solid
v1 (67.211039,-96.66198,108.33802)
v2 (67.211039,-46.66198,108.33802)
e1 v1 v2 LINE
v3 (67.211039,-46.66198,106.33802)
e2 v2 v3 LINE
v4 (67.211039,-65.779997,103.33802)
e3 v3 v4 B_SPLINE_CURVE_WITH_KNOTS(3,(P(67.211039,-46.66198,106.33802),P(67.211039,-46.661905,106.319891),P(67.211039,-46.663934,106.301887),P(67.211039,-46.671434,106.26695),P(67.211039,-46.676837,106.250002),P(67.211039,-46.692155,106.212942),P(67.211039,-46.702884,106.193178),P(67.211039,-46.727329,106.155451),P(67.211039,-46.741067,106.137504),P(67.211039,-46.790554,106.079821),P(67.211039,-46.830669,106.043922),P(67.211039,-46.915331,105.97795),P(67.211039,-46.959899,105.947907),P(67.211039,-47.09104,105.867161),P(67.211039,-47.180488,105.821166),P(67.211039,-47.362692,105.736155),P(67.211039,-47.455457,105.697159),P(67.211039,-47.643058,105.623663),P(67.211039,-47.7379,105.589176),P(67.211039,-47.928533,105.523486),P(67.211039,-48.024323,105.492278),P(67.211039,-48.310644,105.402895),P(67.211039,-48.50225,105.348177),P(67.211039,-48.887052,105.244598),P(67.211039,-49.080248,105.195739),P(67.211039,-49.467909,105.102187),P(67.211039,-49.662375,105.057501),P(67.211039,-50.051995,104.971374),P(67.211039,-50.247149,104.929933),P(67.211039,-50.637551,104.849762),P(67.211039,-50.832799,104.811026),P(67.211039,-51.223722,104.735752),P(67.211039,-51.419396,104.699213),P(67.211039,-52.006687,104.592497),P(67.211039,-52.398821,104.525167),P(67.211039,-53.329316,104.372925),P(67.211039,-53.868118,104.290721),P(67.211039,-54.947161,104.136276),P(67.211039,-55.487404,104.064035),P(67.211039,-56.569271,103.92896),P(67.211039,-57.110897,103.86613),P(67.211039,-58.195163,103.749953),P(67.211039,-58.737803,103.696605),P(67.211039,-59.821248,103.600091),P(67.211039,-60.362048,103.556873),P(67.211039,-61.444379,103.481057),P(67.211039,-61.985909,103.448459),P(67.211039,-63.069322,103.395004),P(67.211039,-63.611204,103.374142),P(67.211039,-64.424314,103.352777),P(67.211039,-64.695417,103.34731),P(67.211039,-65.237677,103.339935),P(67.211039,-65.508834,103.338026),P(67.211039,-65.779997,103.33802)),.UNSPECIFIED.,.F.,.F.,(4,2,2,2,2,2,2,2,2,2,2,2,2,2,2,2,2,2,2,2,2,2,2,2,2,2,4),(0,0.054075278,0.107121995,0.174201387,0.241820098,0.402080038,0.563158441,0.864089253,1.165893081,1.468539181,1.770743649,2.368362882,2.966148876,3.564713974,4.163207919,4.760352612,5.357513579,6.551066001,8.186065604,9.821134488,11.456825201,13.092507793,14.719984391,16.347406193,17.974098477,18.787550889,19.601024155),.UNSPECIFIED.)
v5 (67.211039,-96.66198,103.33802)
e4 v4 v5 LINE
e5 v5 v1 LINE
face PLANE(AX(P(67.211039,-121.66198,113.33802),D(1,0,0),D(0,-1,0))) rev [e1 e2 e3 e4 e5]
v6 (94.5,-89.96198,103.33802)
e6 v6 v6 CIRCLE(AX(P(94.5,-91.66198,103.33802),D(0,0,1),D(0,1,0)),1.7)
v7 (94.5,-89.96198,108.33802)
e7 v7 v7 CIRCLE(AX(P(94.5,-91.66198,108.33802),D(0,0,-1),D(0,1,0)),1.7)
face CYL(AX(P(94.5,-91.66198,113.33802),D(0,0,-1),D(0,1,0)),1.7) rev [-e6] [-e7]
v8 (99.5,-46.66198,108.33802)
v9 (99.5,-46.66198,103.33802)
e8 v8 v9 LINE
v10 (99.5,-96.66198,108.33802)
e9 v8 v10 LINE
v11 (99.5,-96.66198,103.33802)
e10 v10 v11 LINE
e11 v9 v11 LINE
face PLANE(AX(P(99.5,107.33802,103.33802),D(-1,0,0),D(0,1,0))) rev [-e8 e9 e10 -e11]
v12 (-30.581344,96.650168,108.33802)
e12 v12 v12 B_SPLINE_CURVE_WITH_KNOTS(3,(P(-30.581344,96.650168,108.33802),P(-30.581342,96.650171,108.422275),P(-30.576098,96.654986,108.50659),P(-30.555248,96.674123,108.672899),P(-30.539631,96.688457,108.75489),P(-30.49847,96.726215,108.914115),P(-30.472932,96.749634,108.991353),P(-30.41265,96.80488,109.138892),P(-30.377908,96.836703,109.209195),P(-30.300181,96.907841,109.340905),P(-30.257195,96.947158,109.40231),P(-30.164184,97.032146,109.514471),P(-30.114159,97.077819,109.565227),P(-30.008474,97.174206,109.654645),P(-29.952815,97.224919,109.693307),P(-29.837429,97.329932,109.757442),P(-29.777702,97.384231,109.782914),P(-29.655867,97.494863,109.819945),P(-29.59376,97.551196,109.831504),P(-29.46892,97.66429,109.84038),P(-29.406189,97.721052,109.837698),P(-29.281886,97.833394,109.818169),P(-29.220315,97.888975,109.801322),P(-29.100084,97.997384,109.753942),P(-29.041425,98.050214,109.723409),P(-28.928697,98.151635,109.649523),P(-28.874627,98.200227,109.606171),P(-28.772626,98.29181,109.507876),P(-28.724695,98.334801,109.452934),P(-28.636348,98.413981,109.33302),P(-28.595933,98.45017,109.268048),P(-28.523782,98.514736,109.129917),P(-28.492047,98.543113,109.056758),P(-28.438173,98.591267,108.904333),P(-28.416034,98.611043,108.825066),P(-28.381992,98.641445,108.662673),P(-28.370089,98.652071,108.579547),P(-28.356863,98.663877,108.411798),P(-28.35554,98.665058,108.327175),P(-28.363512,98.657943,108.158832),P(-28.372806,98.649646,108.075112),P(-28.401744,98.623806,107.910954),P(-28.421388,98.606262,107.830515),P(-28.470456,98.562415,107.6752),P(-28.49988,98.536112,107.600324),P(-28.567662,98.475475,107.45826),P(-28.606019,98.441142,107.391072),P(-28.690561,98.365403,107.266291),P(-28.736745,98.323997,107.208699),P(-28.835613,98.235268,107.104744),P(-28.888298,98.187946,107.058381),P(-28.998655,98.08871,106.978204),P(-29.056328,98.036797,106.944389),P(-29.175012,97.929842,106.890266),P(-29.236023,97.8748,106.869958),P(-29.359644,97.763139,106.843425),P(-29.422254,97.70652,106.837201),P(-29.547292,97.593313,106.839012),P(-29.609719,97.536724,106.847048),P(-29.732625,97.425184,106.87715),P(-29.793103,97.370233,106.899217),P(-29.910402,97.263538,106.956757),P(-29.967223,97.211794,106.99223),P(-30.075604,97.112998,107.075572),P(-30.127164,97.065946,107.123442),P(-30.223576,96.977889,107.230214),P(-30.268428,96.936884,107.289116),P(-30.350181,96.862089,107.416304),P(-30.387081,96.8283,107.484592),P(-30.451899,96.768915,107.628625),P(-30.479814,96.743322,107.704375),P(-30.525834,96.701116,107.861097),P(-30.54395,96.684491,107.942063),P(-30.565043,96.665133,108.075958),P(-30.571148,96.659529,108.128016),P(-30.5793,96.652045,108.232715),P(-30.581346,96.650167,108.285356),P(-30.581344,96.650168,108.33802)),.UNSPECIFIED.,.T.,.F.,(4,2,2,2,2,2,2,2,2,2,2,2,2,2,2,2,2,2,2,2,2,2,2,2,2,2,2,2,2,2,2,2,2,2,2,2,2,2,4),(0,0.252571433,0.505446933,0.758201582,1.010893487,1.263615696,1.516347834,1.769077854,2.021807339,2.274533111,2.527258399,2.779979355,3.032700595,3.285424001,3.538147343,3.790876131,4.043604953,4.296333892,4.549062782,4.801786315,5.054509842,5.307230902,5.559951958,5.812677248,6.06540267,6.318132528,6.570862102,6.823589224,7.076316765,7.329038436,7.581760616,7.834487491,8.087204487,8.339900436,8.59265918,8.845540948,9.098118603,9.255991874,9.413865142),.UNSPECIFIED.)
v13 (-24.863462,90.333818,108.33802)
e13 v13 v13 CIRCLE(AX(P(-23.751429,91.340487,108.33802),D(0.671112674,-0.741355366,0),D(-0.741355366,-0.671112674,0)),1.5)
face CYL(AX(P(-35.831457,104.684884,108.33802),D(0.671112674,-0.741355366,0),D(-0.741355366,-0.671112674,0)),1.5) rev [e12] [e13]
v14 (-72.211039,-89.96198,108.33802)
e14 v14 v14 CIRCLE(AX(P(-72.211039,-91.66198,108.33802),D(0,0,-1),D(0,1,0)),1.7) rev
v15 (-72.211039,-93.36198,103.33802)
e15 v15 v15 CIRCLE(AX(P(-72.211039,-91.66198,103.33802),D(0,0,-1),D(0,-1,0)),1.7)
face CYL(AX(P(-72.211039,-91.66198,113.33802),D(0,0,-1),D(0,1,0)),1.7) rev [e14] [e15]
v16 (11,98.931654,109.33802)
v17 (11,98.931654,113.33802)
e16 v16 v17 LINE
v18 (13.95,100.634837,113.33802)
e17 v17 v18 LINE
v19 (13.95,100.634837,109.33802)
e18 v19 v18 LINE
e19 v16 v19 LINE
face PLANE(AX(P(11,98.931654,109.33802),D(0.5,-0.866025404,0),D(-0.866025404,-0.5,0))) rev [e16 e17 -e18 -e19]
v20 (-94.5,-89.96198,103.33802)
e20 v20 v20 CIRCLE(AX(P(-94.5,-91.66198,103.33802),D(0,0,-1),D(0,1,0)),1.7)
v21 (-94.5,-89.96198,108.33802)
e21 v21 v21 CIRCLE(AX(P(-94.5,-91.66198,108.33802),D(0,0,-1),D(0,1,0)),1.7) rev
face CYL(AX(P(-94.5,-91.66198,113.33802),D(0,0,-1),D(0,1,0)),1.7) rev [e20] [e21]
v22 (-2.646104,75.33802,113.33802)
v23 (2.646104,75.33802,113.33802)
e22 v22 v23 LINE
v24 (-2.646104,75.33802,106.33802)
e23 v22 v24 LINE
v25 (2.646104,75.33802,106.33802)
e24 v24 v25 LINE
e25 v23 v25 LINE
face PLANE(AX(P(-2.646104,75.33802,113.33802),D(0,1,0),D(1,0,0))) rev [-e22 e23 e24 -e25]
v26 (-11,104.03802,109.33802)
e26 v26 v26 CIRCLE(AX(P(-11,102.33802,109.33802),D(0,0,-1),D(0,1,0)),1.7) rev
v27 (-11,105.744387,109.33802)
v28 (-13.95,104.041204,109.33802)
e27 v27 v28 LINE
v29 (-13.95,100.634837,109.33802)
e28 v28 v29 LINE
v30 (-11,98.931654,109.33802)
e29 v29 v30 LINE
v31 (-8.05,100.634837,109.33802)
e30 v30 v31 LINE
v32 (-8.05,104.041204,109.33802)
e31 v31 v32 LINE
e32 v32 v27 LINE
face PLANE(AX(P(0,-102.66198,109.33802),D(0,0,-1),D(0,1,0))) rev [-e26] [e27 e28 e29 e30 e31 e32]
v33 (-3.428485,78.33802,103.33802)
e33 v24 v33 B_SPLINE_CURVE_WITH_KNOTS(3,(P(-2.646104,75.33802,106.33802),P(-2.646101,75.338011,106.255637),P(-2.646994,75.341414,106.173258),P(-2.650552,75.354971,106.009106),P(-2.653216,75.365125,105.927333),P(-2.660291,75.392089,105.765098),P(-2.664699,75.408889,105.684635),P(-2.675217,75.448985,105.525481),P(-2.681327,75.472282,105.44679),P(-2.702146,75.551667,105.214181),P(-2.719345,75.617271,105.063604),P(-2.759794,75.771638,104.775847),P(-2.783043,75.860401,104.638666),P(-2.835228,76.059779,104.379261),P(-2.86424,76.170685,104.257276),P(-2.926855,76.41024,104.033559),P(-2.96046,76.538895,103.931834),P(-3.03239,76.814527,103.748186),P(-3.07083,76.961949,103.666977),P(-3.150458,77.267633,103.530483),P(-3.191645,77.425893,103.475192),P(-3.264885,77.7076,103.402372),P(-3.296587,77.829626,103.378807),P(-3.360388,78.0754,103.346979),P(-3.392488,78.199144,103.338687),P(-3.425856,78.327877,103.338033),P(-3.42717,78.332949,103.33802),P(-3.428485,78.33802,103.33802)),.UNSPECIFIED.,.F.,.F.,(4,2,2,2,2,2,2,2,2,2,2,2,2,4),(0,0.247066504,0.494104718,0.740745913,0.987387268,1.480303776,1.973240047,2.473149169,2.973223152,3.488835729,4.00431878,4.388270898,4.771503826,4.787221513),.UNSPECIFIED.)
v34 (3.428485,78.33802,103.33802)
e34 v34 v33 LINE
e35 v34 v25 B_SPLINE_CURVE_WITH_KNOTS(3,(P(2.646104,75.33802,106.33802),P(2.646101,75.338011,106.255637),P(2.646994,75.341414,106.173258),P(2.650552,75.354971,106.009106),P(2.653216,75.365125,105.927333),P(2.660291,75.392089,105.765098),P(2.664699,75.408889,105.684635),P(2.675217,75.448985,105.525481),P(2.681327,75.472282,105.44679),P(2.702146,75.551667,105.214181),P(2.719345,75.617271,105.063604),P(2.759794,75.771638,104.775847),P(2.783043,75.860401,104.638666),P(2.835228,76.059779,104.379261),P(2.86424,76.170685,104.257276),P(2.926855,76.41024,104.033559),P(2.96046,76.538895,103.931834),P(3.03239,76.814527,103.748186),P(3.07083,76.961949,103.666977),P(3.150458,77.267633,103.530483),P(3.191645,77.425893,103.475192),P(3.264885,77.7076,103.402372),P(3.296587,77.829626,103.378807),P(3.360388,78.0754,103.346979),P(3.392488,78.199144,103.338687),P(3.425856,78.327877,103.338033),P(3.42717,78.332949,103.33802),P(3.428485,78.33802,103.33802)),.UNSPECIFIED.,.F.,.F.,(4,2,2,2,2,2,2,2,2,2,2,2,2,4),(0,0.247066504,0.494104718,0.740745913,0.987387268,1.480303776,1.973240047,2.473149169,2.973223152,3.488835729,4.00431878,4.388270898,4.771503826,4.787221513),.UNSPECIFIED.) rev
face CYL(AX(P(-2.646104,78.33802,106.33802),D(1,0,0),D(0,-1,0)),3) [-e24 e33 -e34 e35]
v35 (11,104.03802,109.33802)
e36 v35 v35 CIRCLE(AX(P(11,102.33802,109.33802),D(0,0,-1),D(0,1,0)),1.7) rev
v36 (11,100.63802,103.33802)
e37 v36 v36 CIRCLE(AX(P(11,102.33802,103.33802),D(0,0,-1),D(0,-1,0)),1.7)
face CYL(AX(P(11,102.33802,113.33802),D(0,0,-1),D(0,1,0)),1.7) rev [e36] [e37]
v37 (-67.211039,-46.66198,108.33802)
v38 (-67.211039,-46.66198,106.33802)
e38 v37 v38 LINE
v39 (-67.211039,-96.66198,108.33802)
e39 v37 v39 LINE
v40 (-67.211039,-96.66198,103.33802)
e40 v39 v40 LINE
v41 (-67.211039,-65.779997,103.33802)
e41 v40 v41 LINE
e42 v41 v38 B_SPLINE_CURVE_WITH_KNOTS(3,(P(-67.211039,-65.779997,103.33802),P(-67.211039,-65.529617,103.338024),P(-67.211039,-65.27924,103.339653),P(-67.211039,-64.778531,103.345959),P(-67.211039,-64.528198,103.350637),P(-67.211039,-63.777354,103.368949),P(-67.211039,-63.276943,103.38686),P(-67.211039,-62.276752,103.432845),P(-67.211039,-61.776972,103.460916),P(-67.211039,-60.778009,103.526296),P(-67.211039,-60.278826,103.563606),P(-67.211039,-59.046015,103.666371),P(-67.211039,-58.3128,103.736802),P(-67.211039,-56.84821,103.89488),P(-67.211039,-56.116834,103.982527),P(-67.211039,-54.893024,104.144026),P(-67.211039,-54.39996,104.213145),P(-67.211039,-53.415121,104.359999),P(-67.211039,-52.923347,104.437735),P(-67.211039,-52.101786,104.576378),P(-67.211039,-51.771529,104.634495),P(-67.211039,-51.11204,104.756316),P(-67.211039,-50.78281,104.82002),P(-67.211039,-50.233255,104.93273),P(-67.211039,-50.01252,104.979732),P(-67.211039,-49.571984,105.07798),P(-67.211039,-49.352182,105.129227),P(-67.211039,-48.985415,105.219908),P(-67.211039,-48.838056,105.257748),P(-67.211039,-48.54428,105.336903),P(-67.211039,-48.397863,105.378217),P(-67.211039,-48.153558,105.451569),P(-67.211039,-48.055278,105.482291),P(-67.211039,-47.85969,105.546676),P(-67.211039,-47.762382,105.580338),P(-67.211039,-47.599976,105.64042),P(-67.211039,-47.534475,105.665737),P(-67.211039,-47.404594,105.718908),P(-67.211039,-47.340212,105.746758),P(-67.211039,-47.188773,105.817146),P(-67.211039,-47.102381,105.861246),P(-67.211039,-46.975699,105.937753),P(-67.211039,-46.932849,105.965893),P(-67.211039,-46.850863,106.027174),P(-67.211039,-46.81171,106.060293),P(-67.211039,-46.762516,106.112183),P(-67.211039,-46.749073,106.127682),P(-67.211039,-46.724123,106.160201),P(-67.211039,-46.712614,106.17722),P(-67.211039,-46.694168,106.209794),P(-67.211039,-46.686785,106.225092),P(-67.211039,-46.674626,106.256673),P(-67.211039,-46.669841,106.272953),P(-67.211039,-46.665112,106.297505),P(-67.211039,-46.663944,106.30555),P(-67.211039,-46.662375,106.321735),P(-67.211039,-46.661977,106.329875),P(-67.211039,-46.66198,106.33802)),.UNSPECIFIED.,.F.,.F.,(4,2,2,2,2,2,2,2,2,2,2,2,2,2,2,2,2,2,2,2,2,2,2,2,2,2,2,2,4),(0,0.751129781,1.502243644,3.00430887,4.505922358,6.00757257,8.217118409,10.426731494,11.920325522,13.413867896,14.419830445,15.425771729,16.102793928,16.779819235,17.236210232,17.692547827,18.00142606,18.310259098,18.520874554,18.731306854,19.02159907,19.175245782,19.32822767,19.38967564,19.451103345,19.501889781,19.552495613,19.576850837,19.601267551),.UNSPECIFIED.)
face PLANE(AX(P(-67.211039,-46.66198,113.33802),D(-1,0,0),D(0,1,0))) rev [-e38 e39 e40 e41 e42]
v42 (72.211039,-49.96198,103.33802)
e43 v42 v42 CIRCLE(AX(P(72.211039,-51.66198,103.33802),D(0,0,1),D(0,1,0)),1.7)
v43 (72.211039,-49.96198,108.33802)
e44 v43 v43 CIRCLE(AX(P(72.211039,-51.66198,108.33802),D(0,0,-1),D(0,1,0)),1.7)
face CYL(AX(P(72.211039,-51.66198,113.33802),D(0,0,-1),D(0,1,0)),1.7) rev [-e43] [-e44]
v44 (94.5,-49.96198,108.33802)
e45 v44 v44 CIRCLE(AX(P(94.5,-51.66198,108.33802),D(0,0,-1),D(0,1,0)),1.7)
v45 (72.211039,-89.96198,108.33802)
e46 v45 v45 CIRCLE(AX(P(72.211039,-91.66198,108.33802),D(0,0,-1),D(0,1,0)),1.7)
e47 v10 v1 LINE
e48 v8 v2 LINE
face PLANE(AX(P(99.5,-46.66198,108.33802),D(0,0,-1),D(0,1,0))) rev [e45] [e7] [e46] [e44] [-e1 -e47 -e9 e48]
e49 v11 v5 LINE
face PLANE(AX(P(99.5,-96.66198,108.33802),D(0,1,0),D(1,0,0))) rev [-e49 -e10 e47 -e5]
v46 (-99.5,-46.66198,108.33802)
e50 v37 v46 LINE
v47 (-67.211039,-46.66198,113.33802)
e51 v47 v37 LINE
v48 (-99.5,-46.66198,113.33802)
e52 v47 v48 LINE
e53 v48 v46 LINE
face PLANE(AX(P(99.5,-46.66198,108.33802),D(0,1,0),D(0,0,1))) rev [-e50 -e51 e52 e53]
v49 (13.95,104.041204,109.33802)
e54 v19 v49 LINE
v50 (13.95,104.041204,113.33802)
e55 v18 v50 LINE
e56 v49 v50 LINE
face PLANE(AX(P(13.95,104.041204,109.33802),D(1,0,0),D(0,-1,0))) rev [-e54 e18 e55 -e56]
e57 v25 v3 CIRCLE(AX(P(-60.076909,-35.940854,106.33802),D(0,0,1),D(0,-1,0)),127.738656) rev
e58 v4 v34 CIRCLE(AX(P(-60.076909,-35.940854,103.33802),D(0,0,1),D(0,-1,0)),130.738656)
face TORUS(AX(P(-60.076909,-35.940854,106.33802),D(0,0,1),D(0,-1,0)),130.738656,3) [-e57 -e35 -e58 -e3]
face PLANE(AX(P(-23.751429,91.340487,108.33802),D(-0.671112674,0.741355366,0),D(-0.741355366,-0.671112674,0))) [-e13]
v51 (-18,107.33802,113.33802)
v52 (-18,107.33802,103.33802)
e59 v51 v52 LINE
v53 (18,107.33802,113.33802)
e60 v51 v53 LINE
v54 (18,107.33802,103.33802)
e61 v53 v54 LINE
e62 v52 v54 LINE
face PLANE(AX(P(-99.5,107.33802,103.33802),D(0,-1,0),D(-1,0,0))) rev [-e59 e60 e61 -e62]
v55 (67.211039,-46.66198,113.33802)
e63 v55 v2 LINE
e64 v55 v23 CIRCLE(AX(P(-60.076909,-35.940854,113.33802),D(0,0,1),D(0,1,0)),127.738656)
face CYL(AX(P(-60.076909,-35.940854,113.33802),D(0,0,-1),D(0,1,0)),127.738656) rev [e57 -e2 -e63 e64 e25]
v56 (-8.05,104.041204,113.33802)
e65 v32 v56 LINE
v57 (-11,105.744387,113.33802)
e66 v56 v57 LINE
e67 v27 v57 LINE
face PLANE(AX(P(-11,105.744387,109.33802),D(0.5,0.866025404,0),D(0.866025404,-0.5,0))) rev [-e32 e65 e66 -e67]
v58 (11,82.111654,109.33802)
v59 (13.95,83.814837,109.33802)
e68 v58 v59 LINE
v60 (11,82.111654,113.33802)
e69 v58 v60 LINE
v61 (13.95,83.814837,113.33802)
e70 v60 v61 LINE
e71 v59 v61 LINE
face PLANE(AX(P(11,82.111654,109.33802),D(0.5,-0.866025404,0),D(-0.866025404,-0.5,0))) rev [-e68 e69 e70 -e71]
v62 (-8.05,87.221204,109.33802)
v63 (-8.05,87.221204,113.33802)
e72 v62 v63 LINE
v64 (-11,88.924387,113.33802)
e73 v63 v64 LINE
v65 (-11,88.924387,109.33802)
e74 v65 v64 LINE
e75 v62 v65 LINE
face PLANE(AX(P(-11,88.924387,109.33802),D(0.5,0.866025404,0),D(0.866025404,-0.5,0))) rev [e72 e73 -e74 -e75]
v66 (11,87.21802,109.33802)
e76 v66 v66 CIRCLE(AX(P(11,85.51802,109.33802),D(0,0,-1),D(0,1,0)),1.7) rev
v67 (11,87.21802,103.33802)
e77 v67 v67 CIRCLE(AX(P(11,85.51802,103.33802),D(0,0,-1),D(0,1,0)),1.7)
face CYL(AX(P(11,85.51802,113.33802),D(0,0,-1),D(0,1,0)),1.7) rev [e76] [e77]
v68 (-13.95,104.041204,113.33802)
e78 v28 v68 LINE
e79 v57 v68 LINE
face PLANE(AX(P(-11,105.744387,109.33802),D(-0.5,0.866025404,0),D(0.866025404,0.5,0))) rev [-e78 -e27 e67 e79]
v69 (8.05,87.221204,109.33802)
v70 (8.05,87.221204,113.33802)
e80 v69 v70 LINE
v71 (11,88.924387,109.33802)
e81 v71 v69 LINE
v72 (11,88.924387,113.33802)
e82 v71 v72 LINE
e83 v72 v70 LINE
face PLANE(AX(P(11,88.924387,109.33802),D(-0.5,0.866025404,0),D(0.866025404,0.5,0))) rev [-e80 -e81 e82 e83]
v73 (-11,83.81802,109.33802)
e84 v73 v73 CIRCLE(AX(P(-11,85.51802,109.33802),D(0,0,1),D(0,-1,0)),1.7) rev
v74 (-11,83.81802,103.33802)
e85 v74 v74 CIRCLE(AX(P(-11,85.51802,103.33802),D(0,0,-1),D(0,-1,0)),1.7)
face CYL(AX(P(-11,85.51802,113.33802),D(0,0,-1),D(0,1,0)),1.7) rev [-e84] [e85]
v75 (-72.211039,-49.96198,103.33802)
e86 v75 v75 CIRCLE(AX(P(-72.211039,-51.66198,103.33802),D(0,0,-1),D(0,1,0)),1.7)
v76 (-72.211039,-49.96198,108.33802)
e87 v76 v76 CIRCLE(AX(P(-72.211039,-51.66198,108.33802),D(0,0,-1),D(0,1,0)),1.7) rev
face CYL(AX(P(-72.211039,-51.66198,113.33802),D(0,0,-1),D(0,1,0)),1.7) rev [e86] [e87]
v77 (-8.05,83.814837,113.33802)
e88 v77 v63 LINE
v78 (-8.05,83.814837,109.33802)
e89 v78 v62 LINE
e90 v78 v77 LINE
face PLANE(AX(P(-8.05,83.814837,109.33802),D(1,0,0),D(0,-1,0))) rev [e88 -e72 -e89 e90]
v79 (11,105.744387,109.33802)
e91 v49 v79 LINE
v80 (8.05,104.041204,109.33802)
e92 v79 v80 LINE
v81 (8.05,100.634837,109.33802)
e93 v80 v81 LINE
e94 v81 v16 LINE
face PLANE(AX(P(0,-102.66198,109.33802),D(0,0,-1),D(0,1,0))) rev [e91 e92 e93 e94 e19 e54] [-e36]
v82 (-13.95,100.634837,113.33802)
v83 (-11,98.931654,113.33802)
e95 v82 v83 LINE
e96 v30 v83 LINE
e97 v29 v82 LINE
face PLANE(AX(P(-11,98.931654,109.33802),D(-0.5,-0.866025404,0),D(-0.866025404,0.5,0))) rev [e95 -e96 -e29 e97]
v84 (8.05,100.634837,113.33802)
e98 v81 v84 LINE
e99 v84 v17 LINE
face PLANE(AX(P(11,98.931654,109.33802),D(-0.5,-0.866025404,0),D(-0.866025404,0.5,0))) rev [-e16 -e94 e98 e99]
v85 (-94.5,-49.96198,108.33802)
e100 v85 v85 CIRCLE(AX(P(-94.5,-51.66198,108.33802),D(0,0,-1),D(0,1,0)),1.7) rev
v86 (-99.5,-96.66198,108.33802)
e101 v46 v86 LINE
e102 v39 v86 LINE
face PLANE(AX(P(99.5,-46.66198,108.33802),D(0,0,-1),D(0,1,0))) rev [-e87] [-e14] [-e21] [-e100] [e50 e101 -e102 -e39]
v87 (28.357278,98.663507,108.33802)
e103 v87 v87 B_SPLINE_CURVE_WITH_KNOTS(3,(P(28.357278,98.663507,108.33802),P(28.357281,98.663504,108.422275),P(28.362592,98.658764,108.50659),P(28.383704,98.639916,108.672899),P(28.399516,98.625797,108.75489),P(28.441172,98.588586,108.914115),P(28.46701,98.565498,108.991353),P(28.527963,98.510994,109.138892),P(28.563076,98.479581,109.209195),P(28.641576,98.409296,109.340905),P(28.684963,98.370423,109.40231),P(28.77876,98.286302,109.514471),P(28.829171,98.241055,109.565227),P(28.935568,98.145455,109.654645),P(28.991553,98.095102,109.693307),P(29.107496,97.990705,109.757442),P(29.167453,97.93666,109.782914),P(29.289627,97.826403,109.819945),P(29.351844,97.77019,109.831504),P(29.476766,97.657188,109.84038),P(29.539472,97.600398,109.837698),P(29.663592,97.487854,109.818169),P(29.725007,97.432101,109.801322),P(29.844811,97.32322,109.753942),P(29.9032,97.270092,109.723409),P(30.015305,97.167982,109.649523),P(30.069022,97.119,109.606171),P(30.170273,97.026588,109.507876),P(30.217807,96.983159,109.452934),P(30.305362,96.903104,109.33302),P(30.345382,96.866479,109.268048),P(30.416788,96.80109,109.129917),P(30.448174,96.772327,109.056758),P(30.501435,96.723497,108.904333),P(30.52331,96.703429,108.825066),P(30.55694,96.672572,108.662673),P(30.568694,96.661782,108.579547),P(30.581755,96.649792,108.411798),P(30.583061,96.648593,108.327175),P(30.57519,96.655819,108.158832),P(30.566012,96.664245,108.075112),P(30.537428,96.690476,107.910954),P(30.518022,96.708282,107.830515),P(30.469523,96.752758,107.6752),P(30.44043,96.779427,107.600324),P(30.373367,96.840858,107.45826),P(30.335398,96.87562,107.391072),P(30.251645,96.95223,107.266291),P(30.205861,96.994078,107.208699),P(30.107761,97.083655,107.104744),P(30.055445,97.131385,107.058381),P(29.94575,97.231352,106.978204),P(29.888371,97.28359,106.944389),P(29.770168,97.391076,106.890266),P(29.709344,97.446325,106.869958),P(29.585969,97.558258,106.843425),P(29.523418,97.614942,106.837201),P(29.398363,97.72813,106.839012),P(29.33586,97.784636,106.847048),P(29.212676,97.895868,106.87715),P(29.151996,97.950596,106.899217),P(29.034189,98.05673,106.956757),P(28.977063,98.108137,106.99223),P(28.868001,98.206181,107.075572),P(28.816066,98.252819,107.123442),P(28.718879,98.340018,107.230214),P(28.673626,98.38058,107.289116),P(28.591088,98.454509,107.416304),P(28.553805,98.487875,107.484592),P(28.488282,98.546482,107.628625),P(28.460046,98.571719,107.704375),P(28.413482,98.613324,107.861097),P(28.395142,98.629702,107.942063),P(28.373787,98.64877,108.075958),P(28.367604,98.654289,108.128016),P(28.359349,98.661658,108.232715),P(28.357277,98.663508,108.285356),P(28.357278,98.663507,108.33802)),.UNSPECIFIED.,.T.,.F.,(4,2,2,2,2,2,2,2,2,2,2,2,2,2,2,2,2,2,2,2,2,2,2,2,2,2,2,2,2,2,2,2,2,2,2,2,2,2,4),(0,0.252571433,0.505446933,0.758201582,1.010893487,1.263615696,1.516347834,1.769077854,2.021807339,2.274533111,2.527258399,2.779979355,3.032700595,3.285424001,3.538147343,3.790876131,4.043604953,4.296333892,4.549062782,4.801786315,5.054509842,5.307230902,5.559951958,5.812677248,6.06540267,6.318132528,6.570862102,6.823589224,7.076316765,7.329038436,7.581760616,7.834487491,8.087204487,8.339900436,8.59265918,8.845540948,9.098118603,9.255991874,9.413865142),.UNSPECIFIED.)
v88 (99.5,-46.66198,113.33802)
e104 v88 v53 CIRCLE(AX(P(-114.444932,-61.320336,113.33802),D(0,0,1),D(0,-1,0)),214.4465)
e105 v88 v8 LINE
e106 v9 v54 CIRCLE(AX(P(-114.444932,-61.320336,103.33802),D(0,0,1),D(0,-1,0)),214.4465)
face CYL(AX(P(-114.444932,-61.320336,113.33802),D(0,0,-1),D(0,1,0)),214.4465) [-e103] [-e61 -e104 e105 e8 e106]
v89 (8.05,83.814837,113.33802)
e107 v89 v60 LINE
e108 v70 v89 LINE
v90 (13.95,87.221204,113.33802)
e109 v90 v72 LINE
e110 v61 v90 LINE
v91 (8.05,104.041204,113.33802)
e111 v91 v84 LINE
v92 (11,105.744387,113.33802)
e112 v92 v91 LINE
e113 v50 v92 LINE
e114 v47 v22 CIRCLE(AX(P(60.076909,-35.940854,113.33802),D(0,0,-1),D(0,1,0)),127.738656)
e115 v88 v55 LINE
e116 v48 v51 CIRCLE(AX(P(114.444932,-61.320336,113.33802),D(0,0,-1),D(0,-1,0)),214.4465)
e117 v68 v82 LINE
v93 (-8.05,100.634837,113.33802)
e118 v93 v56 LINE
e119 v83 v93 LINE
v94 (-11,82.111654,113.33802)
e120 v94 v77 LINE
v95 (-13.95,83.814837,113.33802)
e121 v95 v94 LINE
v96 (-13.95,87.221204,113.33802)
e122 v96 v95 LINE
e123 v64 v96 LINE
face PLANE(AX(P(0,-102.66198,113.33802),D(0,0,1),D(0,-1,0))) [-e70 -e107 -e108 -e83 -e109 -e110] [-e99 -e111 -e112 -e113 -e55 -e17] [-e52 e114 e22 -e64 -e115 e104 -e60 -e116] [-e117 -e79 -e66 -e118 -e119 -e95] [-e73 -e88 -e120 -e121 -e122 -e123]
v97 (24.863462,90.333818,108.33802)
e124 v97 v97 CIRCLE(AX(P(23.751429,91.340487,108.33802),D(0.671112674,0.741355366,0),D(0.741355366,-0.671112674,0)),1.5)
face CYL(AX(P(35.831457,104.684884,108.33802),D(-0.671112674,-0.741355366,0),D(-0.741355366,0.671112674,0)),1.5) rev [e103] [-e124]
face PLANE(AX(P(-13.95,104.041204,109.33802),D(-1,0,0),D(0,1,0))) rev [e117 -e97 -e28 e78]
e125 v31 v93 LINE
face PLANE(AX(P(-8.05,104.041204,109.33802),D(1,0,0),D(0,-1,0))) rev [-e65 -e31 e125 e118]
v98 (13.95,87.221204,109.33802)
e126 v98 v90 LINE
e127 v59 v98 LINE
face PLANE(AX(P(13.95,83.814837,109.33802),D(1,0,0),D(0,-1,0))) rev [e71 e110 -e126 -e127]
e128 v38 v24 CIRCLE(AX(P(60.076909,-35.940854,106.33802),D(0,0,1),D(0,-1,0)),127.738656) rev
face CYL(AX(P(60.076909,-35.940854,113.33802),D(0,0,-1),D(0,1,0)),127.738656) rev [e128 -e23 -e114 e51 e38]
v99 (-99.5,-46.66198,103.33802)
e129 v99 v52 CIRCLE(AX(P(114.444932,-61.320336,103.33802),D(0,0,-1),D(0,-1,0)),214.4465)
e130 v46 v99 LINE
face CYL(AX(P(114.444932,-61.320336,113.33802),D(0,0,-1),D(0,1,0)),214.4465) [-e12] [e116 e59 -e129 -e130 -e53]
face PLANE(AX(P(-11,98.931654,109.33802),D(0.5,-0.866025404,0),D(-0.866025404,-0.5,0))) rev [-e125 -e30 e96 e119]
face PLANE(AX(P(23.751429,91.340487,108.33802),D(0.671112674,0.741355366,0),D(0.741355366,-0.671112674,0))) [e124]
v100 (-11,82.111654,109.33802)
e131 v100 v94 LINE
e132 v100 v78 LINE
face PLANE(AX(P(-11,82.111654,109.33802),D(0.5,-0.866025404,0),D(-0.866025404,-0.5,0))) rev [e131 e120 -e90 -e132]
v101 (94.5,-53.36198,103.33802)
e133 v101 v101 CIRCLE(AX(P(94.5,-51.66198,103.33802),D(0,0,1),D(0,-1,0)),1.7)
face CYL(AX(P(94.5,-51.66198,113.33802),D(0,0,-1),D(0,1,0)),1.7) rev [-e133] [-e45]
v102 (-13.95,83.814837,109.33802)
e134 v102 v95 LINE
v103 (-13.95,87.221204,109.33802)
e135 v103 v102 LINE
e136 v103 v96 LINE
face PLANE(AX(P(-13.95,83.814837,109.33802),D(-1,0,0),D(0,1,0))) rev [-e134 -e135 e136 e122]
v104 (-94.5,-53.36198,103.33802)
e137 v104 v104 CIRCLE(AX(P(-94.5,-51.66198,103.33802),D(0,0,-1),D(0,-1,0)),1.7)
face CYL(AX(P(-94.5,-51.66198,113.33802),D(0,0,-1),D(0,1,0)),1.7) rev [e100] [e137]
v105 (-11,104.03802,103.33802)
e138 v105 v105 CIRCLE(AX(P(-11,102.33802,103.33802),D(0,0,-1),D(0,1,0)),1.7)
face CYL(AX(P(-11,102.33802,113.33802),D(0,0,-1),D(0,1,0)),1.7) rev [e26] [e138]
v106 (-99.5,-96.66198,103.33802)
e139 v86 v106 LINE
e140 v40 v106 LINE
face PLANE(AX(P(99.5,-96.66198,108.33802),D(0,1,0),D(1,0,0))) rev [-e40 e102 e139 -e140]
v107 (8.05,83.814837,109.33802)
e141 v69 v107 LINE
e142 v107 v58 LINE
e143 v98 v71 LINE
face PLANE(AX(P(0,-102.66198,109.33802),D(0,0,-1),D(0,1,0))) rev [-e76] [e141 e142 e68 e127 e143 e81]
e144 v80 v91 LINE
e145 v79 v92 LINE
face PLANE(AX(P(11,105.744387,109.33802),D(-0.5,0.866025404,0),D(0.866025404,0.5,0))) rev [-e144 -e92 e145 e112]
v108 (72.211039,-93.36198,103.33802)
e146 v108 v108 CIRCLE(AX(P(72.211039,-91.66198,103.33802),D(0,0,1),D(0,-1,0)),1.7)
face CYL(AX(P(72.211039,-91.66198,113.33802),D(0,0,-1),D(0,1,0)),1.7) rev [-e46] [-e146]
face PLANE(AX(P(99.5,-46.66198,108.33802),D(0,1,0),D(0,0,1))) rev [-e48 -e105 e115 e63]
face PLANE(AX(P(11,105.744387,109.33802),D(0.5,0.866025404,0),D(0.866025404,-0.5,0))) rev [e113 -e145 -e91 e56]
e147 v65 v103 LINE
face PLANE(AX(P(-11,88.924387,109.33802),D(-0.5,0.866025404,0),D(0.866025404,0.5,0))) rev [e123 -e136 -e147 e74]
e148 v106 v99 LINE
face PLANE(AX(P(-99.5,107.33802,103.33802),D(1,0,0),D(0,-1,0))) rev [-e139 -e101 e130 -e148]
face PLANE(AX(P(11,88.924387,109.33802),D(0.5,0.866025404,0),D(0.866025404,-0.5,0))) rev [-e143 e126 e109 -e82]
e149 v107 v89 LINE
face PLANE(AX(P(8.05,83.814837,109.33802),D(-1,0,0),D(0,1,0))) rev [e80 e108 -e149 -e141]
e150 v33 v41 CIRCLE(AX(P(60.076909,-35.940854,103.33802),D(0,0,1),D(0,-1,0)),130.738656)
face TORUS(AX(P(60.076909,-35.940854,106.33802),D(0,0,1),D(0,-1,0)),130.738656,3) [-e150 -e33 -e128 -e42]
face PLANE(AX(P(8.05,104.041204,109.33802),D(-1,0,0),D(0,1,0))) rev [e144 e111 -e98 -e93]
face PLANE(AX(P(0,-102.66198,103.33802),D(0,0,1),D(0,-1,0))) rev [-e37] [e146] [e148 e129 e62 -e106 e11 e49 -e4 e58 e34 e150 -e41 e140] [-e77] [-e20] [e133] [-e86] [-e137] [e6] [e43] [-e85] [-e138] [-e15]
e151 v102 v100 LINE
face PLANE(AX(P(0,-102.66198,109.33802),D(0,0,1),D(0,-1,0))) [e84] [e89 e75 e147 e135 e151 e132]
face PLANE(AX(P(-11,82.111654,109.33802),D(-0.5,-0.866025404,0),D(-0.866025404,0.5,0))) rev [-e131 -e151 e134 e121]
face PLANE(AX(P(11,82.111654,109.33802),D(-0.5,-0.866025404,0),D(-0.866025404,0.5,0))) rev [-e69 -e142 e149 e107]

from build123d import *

# Parameters (mm, degrees)
SKIZZE1_W                          = 199
SKIZZE1_H                          = 420
AUFSATZ_LINEAR_AUSTRAGEN1_DEPTH    = 10
SKIZZE5_W                          = 199
SKIZZE5_H                          = 85
SCHNITT_LINEAR_AUSTRAGEN2_DEPTH    = 10
SKIZZE6_R                          = 1.7
SCHNITT_LINEAR_AUSTRAGEN3_DEPTH    = 233.594604409
SCHNITT_LINEAR_AUSTRAGEN4_DEPTH    = 4
SKIZZE20_R                         = 1.7
SCHNITT_LINEAR_AUSTRAGEN12_DEPTH   = 233.594604409
SKIZZE21_W                         = 134.422077922
SKIZZE21_H                         = 75
SCHNITT_LINEAR_AUSTRAGEN13_DEPTH   = 233.594604409
SCHNITT_LINEAR_AUSTRAGEN14_DEPTH   = 233.594604409
AUFSATZ_LINEAR_AUSTRAGEN6_DEPTH    = 10
SKIZZE25_R                         = 1.7
SCHNITT_LINEAR_AUSTRAGEN15_DEPTH   = 233.594604409
SCHNITT_LINEAR_AUSTRAGEN16_DEPTH   = 290.484023739
VERRUNDUNG1_R                      = 3
SCHNITT_LINEAR_START               = -8
SKIZZE28_R                         = 1.5
SCHNITT_LINEAR_AUSTRAGEN17_DEPTH   = 18
K_RPER_VERSCHIEBEN_KOPIEREN1_ANGLE = 90


with BuildPart() as part:
    # Skizze1 → Aufsatz-Linear austragen1 (new body)
    with BuildSketch(Plane(origin=(0, 0, 0), x_dir=(1, 0, 0), z_dir=(0, 1, 0))):
        Rectangle(SKIZZE1_W, SKIZZE1_H)
    extrude(amount=AUFSATZ_LINEAR_AUSTRAGEN1_DEPTH)

    # Skizze5 → Schnitt-Linear austragen2 (cut)
    with BuildSketch(Plane(origin=(0, 10, 0), x_dir=(1, 0, 0), z_dir=(0, 1, 0))):
        Polygon((99.5, -210), (18, -210), (99.5, -56), align=None)
        Polygon((-18, -210), (-99.5, -56), (-99.5, -210), align=None)
        with Locations((0, 167.5)):
            Rectangle(SKIZZE5_W, SKIZZE5_H)
        Polygon((67.211038961, -56), (-67.211038961, -56), (-2.646103896, -178), (2.646103896, -178), align=None)
    extrude(amount=-SCHNITT_LINEAR_AUSTRAGEN2_DEPTH, mode=Mode.SUBTRACT)

    # Skizze6 → Schnitt-Linear austragen3 (cut, through all)
    with BuildSketch(Plane(origin=(0, 10, 0), x_dir=(1, 0, 0), z_dir=(0, 1, 0))):
        with Locations(Location((-11, -205, 0), (0, 0, 270))):
            Circle(SKIZZE6_R)
        with Locations(Location((-11, -188.18, 0), (0, 0, 90))):
            Circle(SKIZZE6_R)
        with Locations(Location((11, -205, 0), (0, 0, 90))):
            Circle(SKIZZE6_R)
        with Locations(Location((11, -188.18, 0), (0, 0, 270))):
            Circle(SKIZZE6_R)
    extrude(amount=-SCHNITT_LINEAR_AUSTRAGEN3_DEPTH, mode=Mode.SUBTRACT)

    # Skizze7 → Schnitt-Linear austragen4 (cut)
    with BuildSketch(Plane.XZ):
        Polygon((-11, 208.406366588), (-8.05, 206.703183294), (-8.05, 203.296816706), (-11, 201.593633412), (-13.95, 203.296816706), (-13.95, 206.703183294), align=None)
        Polygon((11, 208.406366588), (8.05, 206.703183294), (8.05, 203.296816706), (11, 201.593633412), (13.95, 203.296816706), (13.95, 206.703183294), align=None)
        Polygon((-8.05, 186.476816706), (-8.05, 189.883183294), (-11, 191.586366588), (-13.95, 189.883183294), (-13.95, 186.476816706), (-11, 184.773633412), align=None)
        Polygon((8.05, 186.476816706), (8.05, 189.883183294), (11, 191.586366588), (13.95, 189.883183294), (13.95, 186.476816706), (11, 184.773633412), align=None)
    extrude(amount=-SCHNITT_LINEAR_AUSTRAGEN4_DEPTH, mode=Mode.SUBTRACT)

    # Skizze20 → Schnitt-Linear austragen12 (cut, through all)
    with BuildSketch(Plane(origin=(0, 10, 0), x_dir=(1, 0, 0), z_dir=(0, 1, 0))):
        with Locations(Location((90.5, 119.52, 0), (0, 0, 270))):
            Circle(SKIZZE20_R)
        with Locations(Location((48.5, 119.52, 0), (0, 0, 270))):
            Circle(SKIZZE20_R)
        with Locations(Location((-48.5, 119.52, 0), (0, 0, 90))):
            Circle(SKIZZE20_R)
        with Locations(Location((-90.5, 119.52, 0), (0, 0, 90))):
            Circle(SKIZZE20_R)
        with Locations(Location((87, 43.82, 0), (0, 0, 270))):
            Circle(SKIZZE20_R)
        with Locations(Location((52, 43.82, 0), (0, 0, 270))):
            Circle(SKIZZE20_R)
        with Locations(Location((-87, 43.82, 0), (0, 0, 90))):
            Circle(SKIZZE20_R)
        with Locations(Location((-52, 43.82, 0), (0, 0, 90))):
            Circle(SKIZZE20_R)
    extrude(amount=-SCHNITT_LINEAR_AUSTRAGEN12_DEPTH, mode=Mode.SUBTRACT)

    # Skizze21 → Schnitt-Linear austragen13 (cut, through all)
    with BuildSketch(Plane(origin=(0, 10, 0), x_dir=(1, 0, 0), z_dir=(0, 1, 0))):
        with Locations((0, -18.5)):
            Rectangle(SKIZZE21_W, SKIZZE21_H)
    extrude(amount=-SCHNITT_LINEAR_AUSTRAGEN13_DEPTH, mode=Mode.SUBTRACT)

    # Skizze22 → Schnitt-Linear austragen14 (cut, through all)
    with BuildSketch(Plane(origin=(0, 10, 0), x_dir=(1, 0, 0), z_dir=(0, 1, 0))):
        with BuildLine():
            Line((-67.211038961, -56), (-2.646103896, -178))
            ThreePointArc((-2.646103896, -178), (-52.825886854, -126.471631215), (-67.211038961, -56))
        make_face()
    schnitt_linear_austragen14 = extrude(amount=-SCHNITT_LINEAR_AUSTRAGEN14_DEPTH, mode=Mode.SUBTRACT)

    # Skizze23 → Aufsatz-Linear austragen6 (add)
    with BuildSketch(Plane(origin=(0, 10, 0), x_dir=(1, 0, 0), z_dir=(0, 1, 0))):
        with BuildLine():
            Line((-99.5, -56), (-18, -210))
            ThreePointArc((-18, -210), (-75.095260266, -141.650251374), (-99.5, -56))
        make_face()
    aufsatz_linear_austragen6 = extrude(amount=-AUFSATZ_LINEAR_AUSTRAGEN6_DEPTH)

    # Spiegeln2: Schnitt-Linear austragen14, Aufsatz-Linear austragen6 across plane
    add(schnitt_linear_austragen14.mirror(Plane(origin=(0, 0, 0), x_dir=(0, 0, 1), z_dir=(1, 0, 0))), mode=Mode.SUBTRACT)
    add(aufsatz_linear_austragen6.mirror(Plane(origin=(0, 0, 0), x_dir=(0, 0, 1), z_dir=(1, 0, 0))))

    # Skizze25 → Schnitt-Linear austragen15 (cut, through all)
    with BuildSketch(Plane(origin=(0, 10, 0), x_dir=(1, 0, 0), z_dir=(0, 1, 0))):
        with Locations(Location((-94.5, -11, 0), (0, 0, 270))):
            Circle(SKIZZE25_R)
        with Locations(Location((-72.211038961, -11, 0), (0, 0, 90))):
            Circle(SKIZZE25_R)
        with Locations(Location((-72.211038961, -51, 0), (0, 0, 270))):
            Circle(SKIZZE25_R)
        with Locations(Location((-94.5, -51, 0), (0, 0, 90))):
            Circle(SKIZZE25_R)
    schnitt_linear_austragen15 = extrude(amount=-SCHNITT_LINEAR_AUSTRAGEN15_DEPTH, mode=Mode.SUBTRACT)

    # Spiegeln3: Schnitt-Linear austragen15 across plane
    add(schnitt_linear_austragen15.mirror(Plane(origin=(0, 0, 0), x_dir=(0, 0, 1), z_dir=(1, 0, 0))), mode=Mode.SUBTRACT)

    # Skizze26 → Schnitt-Linear austragen16 (cut, through all)
    with BuildSketch(Plane.ZY.offset(99.5)):
        Polygon((56, 5), (56, 0), (4.196805737, -14.401746423), (-137.707729511, -14.401746423), (-137.707729511, 19.508660812), (5.012761814, 19.508660812), (6, 10), (6, 5), align=None)
    extrude(amount=-SCHNITT_LINEAR_AUSTRAGEN16_DEPTH, mode=Mode.SUBTRACT)

    # Verrundung1
    # the kernel refuses this fillet: 3 mm, written as the material it takes off along each edge
    with BuildSketch(Plane(origin=(60.076908998, 10, 66.721125619), x_dir=(-0.4390500946900349, 0, 0.8984625837243705), z_dir=(0.8984625837243705, 0, 0.4390500946900349))) as verrundung1_piece_1_section:
        with BuildLine():
            CenterArc((127.738655974 + VERRUNDUNG1_R, VERRUNDUNG1_R), VERRUNDUNG1_R, 180, 90)
            Line((127.738655974, VERRUNDUNG1_R), (127.738655974, 0))
            Line((127.738655974, 0), (127.738655974 + VERRUNDUNG1_R, 0))
        make_face()
    verrundung1_piece_1 = revolve(axis=Axis((60.076908998, 10, 66.721125619), (0, -1, 0)), revolution_arc=78.865488706, mode=Mode.PRIVATE)
    verrundung1_piece_1 = split(verrundung1_piece_1, bisect_by=Plane(origin=(60.076908998, 10, 178), z_dir=(0, 0, -1)), keep=Keep.TOP, mode=Mode.PRIVATE)
    add(verrundung1_piece_1, mode=Mode.SUBTRACT)
    with BuildSketch(Plane(origin=(-60.076908998, 10, 66.721125619), x_dir=(0.4390500946900349, 0, 0.8984625837243705), z_dir=(-0.8984625837243705, 0, 0.4390500946900349))) as verrundung1_piece_2_section:
        with BuildLine():
            CenterArc((127.738655974 + VERRUNDUNG1_R, -VERRUNDUNG1_R), VERRUNDUNG1_R, 90, 90)
            Line((127.738655974, -VERRUNDUNG1_R), (127.738655974, 0))
            Line((127.738655974, 0), (127.738655974 + VERRUNDUNG1_R, 0))
        make_face()
    verrundung1_piece_2 = revolve(axis=Axis((-60.076908998, 10, 66.721125619), (0, 1, 0)), revolution_arc=78.865488706, mode=Mode.PRIVATE)
    verrundung1_piece_2 = split(verrundung1_piece_2, bisect_by=Plane(origin=(-60.076908998, 10, 178), z_dir=(0, 0, -1)), keep=Keep.TOP, mode=Mode.PRIVATE)
    add(verrundung1_piece_2, mode=Mode.SUBTRACT)
    with BuildSketch(Plane(origin=(-10.146103896, 10, 178), x_dir=(0, 0, 1), z_dir=(1, 0, 0))) as verrundung1_piece_3_section:
        with BuildLine():
            CenterArc((VERRUNDUNG1_R, VERRUNDUNG1_R), VERRUNDUNG1_R, 180, 90)
            Line((0, VERRUNDUNG1_R), (0, 0))
            Line((0, 0), (VERRUNDUNG1_R, 0))
        make_face()
    verrundung1_piece_3 = extrude(amount=20.292207792, mode=Mode.PRIVATE)
    verrundung1_piece_3 = verrundung1_piece_3 & Plane(origin=(60.076908998, 10, 66.721125619), x_dir=(-0.4910260908528423, 0, 0.8711448663120137), z_dir=(0, 1, 0)) * Cylinder(127.738655974, 53, mode=Mode.PRIVATE)
    verrundung1_piece_3 = verrundung1_piece_3 & Plane(origin=(-60.076908998, 10, 66.721125619), x_dir=(0.4910260908528423, 0, 0.8711448663120137), z_dir=(0, 1, 0)) * Cylinder(127.738655974, 53, mode=Mode.PRIVATE)
    add(verrundung1_piece_3, mode=Mode.SUBTRACT)
    with BuildSketch(Plane(origin=(-10.146103896, 10, 178), x_dir=(0, 0, 1), z_dir=(1, 0, 0))) as verrundung1_piece_4_section:
        with BuildLine():
            CenterArc((VERRUNDUNG1_R, VERRUNDUNG1_R), VERRUNDUNG1_R, 180, 90)
            Line((0, VERRUNDUNG1_R), (0, 0))
            Line((0, 0), (VERRUNDUNG1_R, 0))
        make_face()
    verrundung1_piece_4 = extrude(amount=20.292207792, mode=Mode.PRIVATE)
    verrundung1_piece_4 = verrundung1_piece_4 - Plane(origin=(60.076908998, 10, 66.721125619), x_dir=(-0.4910260908528423, 0, 0.8711448663120137), z_dir=(0, 1, 0)) * Cylinder(127.738655974, 53, mode=Mode.PRIVATE)
    verrundung1_piece_4 = verrundung1_piece_4 - Plane(origin=(-60.076908998, 10, 66.721125619), x_dir=(0.4910260908528423, 0, 0.8711448663120137), z_dir=(0, 1, 0)) * Cylinder(127.738655974, 53, mode=Mode.PRIVATE)
    add(verrundung1_piece_4, mode=Mode.SUBTRACT)
    with BuildSketch(Plane(origin=(60.076908998, 10, 66.721125619), x_dir=(-0.4390500946900349, 0, 0.8984625837243705), z_dir=(0.8984625837243705, 0, 0.4390500946900349))) as verrundung1_piece_5a_section:
        with BuildLine():
            CenterArc((127.738655974 + VERRUNDUNG1_R, VERRUNDUNG1_R), VERRUNDUNG1_R, 180, 90)
            Line((127.738655974, VERRUNDUNG1_R), (127.738655974, 0))
            Line((127.738655974, 0), (127.738655974 + VERRUNDUNG1_R, 0))
        make_face()
    verrundung1_piece_5a = revolve(axis=Axis((60.076908998, 10, 66.721125619), (0, -1, 0)), revolution_arc=78.865488706, mode=Mode.PRIVATE)
    verrundung1_piece_5a = split(verrundung1_piece_5a, bisect_by=Plane(origin=(60.076908998, 10, 178), z_dir=(0, 0, 1)), keep=Keep.TOP, mode=Mode.PRIVATE)
    with BuildSketch(Plane(origin=(-10.146103896, 10, 178), x_dir=(0, 0, 1), z_dir=(1, 0, 0))) as verrundung1_piece_5b_section:
        with BuildLine():
            CenterArc((VERRUNDUNG1_R, VERRUNDUNG1_R), VERRUNDUNG1_R, 180, 90)
            Line((0, VERRUNDUNG1_R), (0, 0))
            Line((0, 0), (VERRUNDUNG1_R, 0))
        make_face()
    verrundung1_piece_5b = extrude(amount=20.292207792, mode=Mode.PRIVATE)
    verrundung1_piece_5b = verrundung1_piece_5b - Plane(origin=(60.076908998, 10, 66.721125619), x_dir=(-0.4910260908528423, 0, 0.8711448663120137), z_dir=(0, 1, 0)) * Cylinder(127.738655974, 53, mode=Mode.PRIVATE)
    verrundung1_piece_5b = verrundung1_piece_5b & Plane(origin=(-60.076908998, 10, 66.721125619), x_dir=(0.4910260908528423, 0, 0.8711448663120137), z_dir=(0, 1, 0)) * Cylinder(127.738655974, 53, mode=Mode.PRIVATE)
    verrundung1_piece_5 = verrundung1_piece_5a & verrundung1_piece_5b
    add(verrundung1_piece_5, mode=Mode.SUBTRACT)
    with BuildSketch(Plane(origin=(-10.146103896, 10, 178), x_dir=(0, 0, 1), z_dir=(1, 0, 0))) as verrundung1_piece_6a_section:
        with BuildLine():
            CenterArc((VERRUNDUNG1_R, VERRUNDUNG1_R), VERRUNDUNG1_R, 180, 90)
            Line((0, VERRUNDUNG1_R), (0, 0))
            Line((0, 0), (VERRUNDUNG1_R, 0))
        make_face()
    verrundung1_piece_6a = extrude(amount=20.292207792, mode=Mode.PRIVATE)
    verrundung1_piece_6a = verrundung1_piece_6a & Plane(origin=(60.076908998, 10, 66.721125619), x_dir=(-0.4910260908528423, 0, 0.8711448663120137), z_dir=(0, 1, 0)) * Cylinder(127.738655974, 53, mode=Mode.PRIVATE)
    verrundung1_piece_6a = verrundung1_piece_6a - Plane(origin=(-60.076908998, 10, 66.721125619), x_dir=(0.4910260908528423, 0, 0.8711448663120137), z_dir=(0, 1, 0)) * Cylinder(127.738655974, 53, mode=Mode.PRIVATE)
    with BuildSketch(Plane(origin=(-60.076908998, 10, 66.721125619), x_dir=(0.4390500946900349, 0, 0.8984625837243705), z_dir=(-0.8984625837243705, 0, 0.4390500946900349))) as verrundung1_piece_6b_section:
        with BuildLine():
            CenterArc((127.738655974 + VERRUNDUNG1_R, -VERRUNDUNG1_R), VERRUNDUNG1_R, 90, 90)
            Line((127.738655974, -VERRUNDUNG1_R), (127.738655974, 0))
            Line((127.738655974, 0), (127.738655974 + VERRUNDUNG1_R, 0))
        make_face()
    verrundung1_piece_6b = revolve(axis=Axis((-60.076908998, 10, 66.721125619), (0, 1, 0)), revolution_arc=78.865488706, mode=Mode.PRIVATE)
    verrundung1_piece_6b = split(verrundung1_piece_6b, bisect_by=Plane(origin=(-60.076908998, 10, 178), z_dir=(0, 0, 1)), keep=Keep.TOP, mode=Mode.PRIVATE)
    verrundung1_piece_6 = verrundung1_piece_6a & verrundung1_piece_6b
    add(verrundung1_piece_6, mode=Mode.SUBTRACT)

    # Skizze28 → Schnitt-Linear austragen17 (cut)
    with BuildSketch(Plane(origin=(112.588986226, 0, 124.373227212), x_dir=(0.7413553660235626, -3.83472624348763e-15, -0.6711126740481583), z_dir=(0.6711126740481583, 4.386064313365748e-15, 0.7413553660235626)).offset(SCHNITT_LINEAR_START)):
        with Locations(Location((-112.589264962, 5, 0), (0, 0, 180))):
            Circle(SKIZZE28_R)
    schnitt_linear_austragen17 = extrude(amount=SCHNITT_LINEAR_AUSTRAGEN17_DEPTH, mode=Mode.SUBTRACT)

    # Spiegeln4: Schnitt-Linear austragen17 across plane
    add(schnitt_linear_austragen17.mirror(Plane(origin=(0, 0, 0), x_dir=(0, 0, 1), z_dir=(1, 0, 0))), mode=Mode.SUBTRACT)


with BuildPart() as part_1:
    # Körper-Verschieben/Kopieren1: moved
    add(part.part.rotate(Axis((0, 5.338020233, 108), (-1, 0, 0)), K_RPER_VERSCHIEBEN_KOPIEREN1_ANGLE))


solid = part_1.part
